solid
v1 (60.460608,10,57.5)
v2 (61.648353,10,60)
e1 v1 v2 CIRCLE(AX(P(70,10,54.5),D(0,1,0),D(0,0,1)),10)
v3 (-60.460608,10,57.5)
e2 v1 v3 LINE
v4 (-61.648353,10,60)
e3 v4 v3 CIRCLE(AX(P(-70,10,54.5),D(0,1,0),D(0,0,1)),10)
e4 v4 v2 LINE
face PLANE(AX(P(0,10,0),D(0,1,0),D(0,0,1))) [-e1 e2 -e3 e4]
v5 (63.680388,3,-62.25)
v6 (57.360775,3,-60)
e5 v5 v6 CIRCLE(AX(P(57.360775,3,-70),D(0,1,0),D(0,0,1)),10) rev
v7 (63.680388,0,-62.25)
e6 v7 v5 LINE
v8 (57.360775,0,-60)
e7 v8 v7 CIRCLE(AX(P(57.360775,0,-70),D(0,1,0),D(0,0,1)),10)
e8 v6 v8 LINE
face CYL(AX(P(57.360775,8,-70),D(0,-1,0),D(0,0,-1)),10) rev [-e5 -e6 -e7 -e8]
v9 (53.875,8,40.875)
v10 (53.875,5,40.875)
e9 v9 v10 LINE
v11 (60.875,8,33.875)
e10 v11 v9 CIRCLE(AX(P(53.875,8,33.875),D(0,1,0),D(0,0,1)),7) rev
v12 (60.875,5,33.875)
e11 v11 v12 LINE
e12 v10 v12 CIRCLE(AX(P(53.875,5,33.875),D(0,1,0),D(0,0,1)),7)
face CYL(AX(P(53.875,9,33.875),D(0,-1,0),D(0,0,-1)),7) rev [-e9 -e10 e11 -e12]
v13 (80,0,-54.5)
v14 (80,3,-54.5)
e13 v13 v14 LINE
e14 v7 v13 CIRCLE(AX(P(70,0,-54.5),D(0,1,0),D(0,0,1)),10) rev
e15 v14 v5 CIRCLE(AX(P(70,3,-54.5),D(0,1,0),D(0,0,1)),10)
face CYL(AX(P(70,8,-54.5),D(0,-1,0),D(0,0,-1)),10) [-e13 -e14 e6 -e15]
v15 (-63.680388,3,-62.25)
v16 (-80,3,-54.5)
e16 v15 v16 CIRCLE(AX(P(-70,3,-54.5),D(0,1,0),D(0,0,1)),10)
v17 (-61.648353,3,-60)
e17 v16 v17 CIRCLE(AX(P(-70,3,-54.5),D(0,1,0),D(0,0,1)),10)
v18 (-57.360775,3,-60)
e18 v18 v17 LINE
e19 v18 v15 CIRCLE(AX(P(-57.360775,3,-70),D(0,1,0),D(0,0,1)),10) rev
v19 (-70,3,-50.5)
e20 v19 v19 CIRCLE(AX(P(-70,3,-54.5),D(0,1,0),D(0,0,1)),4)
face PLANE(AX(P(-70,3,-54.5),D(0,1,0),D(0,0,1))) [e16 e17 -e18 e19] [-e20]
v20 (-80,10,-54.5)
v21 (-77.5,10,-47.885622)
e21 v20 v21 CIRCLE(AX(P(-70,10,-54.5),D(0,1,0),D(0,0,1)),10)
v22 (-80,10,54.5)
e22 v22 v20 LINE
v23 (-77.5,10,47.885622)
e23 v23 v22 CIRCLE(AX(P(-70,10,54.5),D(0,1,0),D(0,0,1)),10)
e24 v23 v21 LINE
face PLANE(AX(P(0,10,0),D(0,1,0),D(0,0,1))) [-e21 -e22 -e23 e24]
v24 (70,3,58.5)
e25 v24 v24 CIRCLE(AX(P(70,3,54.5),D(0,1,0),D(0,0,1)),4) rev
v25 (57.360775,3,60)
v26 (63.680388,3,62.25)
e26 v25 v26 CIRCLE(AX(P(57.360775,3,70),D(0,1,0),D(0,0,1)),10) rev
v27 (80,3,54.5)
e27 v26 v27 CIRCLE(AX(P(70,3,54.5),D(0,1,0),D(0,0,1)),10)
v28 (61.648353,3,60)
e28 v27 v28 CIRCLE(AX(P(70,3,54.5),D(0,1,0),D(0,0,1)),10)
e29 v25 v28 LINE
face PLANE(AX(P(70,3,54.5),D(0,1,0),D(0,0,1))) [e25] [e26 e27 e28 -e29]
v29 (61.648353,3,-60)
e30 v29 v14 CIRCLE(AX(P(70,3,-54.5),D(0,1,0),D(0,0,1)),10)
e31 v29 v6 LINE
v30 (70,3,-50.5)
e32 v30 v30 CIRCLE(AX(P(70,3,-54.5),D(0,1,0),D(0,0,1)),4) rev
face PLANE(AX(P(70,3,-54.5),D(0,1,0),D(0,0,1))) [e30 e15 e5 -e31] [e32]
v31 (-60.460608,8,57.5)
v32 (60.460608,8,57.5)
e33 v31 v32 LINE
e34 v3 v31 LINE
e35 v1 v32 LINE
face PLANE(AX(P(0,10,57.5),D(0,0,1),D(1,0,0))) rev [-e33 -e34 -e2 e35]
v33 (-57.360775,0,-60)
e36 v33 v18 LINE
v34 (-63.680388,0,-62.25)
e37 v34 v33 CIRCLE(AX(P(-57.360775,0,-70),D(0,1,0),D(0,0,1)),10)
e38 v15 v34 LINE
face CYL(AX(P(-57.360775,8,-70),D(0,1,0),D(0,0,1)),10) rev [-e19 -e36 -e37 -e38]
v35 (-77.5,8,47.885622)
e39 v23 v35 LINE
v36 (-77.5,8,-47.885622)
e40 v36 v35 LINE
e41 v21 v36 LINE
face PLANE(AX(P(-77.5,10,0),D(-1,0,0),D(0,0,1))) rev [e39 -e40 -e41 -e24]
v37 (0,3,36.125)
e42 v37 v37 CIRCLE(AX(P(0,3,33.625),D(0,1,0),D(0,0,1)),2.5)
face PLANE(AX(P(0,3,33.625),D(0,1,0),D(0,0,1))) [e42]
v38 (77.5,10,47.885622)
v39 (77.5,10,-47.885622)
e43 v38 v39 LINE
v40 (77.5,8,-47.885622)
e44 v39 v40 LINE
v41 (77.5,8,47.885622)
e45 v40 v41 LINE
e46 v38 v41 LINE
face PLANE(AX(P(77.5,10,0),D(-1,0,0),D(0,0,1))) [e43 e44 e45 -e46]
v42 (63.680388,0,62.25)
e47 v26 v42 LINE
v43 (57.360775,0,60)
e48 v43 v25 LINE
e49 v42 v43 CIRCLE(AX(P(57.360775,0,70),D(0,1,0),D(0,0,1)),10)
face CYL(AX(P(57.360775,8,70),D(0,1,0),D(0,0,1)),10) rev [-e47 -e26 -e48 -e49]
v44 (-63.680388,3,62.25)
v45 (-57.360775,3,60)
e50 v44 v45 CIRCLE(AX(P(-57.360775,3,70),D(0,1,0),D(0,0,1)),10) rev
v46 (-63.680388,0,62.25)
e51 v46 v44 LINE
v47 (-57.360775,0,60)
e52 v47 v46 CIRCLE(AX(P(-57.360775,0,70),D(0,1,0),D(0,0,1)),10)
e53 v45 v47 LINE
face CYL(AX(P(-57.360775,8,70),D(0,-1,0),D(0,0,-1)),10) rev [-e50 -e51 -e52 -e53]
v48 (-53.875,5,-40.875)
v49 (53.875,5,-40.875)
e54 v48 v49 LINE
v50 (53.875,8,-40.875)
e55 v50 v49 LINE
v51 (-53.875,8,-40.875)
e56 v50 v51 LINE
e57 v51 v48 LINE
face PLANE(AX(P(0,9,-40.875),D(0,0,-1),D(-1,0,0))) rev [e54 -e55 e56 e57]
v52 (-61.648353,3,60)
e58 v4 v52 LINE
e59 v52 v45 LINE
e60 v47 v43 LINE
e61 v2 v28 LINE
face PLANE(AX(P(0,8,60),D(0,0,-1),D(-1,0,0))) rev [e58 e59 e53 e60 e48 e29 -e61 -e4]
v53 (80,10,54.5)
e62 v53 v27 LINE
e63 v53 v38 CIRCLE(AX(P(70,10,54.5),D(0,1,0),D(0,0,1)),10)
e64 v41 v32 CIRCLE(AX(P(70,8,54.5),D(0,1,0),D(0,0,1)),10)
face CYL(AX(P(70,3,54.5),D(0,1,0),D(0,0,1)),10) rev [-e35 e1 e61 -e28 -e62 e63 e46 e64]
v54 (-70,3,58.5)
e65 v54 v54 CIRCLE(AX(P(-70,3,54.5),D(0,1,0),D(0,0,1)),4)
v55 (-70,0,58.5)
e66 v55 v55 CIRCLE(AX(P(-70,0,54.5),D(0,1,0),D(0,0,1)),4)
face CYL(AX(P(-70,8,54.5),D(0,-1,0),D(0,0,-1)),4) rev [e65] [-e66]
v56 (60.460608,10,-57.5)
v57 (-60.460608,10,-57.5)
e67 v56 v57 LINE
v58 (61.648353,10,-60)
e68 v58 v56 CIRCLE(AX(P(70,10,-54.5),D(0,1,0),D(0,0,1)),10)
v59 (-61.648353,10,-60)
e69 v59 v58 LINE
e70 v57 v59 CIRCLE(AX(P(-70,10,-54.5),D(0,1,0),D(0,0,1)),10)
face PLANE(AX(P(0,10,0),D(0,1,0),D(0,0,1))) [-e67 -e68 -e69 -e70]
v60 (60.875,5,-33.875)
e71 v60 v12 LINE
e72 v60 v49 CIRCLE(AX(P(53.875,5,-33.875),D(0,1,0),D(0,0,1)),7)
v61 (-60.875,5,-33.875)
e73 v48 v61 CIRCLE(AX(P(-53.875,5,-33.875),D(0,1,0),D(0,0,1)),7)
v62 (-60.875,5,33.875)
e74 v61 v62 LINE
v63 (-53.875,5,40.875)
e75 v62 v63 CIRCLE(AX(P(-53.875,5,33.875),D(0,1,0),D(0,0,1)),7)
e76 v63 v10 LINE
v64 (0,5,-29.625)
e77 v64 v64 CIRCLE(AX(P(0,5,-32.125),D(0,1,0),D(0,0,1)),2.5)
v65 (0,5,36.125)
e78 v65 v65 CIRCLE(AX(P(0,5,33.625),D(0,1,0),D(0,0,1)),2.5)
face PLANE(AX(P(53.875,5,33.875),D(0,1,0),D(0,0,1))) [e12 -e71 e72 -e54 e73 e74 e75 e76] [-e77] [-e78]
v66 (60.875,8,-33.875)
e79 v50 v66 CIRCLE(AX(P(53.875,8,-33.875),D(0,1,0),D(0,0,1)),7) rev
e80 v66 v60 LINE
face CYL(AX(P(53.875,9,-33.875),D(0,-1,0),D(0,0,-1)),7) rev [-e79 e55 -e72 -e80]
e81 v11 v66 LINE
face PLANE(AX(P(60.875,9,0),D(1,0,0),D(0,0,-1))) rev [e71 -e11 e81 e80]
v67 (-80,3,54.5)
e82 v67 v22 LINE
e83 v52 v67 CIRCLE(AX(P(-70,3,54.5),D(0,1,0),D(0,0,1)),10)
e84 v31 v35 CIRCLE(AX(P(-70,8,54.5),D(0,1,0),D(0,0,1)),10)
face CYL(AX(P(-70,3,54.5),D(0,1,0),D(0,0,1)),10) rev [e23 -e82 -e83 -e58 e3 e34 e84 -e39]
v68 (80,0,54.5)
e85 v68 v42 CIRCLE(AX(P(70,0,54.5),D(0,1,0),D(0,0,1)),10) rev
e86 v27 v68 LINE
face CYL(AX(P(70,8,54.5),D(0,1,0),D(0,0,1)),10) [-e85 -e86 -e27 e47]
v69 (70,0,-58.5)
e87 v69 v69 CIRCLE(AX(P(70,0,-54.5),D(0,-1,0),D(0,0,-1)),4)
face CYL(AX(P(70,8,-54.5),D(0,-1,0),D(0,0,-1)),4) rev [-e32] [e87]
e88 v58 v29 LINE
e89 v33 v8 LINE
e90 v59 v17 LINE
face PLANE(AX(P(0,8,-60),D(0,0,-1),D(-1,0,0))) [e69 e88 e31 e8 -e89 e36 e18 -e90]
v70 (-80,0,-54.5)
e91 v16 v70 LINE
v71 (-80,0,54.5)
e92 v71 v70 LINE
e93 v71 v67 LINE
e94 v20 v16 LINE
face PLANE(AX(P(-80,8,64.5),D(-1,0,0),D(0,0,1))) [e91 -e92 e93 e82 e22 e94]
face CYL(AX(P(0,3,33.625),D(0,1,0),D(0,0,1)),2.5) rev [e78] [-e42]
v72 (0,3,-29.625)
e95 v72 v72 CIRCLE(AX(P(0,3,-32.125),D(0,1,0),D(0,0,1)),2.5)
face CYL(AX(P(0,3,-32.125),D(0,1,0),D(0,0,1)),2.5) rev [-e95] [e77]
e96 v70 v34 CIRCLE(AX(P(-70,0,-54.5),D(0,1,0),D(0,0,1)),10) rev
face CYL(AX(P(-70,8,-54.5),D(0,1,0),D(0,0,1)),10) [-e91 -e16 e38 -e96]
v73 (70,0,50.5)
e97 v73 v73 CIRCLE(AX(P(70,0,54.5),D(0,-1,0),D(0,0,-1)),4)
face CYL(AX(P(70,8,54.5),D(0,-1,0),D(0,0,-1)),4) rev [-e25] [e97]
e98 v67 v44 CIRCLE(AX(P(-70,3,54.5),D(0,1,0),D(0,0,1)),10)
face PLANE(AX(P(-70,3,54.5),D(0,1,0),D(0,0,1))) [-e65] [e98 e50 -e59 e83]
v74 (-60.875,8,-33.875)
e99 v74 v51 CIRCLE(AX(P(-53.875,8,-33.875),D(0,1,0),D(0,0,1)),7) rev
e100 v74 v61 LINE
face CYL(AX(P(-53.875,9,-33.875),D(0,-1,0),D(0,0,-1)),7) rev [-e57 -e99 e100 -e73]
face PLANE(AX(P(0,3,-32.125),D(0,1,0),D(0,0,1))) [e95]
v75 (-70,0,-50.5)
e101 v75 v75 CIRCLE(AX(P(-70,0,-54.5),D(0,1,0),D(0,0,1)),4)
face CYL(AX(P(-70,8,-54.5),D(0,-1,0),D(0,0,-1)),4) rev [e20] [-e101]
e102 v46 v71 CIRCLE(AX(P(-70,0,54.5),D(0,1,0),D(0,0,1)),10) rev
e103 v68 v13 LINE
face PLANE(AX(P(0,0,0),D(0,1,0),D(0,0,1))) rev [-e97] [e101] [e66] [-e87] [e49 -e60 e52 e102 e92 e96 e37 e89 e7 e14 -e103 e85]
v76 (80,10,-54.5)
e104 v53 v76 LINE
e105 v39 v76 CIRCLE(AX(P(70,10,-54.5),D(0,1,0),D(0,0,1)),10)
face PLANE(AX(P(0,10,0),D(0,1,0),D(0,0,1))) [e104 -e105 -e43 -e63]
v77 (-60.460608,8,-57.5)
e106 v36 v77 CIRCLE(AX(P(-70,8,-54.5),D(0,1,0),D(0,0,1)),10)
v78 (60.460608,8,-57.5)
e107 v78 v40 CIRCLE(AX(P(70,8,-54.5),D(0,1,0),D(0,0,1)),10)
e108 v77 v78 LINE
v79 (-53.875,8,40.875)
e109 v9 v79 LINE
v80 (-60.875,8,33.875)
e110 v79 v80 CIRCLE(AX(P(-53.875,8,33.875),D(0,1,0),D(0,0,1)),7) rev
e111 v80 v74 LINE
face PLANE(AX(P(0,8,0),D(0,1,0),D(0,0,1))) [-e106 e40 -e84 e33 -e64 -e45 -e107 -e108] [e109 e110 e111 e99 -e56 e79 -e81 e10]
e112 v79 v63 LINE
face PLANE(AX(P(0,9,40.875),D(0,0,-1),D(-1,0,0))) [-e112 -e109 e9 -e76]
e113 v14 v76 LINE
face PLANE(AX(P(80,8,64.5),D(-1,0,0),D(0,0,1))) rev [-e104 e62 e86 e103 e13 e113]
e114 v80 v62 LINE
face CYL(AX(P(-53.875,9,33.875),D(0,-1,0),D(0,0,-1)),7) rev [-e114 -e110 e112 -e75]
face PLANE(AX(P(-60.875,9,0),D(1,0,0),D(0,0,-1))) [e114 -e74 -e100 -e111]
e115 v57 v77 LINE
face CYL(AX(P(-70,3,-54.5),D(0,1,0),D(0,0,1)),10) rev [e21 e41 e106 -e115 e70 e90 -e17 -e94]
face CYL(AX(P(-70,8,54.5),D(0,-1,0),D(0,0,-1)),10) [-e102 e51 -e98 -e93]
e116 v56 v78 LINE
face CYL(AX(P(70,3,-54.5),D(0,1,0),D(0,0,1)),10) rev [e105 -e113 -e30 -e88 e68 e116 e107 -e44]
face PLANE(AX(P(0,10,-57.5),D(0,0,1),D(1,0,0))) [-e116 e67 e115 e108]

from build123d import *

# Parameters (mm, degrees)
SKETCH1_W               = 160
SKETCH1_H               = 129
BOSS_EXTRUDE1_DEPTH     = 8
SKETCH1_3_R             = 4
CUT_EXTRUDE2_DEPTH      = 104.074002542
FILLET1_R               = 10
CUT_EXTRUDE4_DEPTH      = 1
CUT_EXTRUDE4_DEPTH_BACK = 3
CUT_EXTRUDE4_START      = 8
CUT_EXTRUDE9_DEPTH      = 104.074002542
CUT_EXTRUDE10_START     = 8
SKETCH1_17_R            = 2.5
SKETCH1_17_R_2          = 10
CUT_EXTRUDE10_DEPTH     = 5
BOSS_EXTRUDE4_START     = 10
BOSS_EXTRUDE4_DEPTH     = 10
FILLET2_R               = 10


with BuildPart() as part:
    # Sketch1 → Boss-Extrude1 (new body)
    with BuildSketch(Plane(origin=(0, 0, 0), x_dir=(1, 0, 0), z_dir=(0, 1, 0))):
        Rectangle(SKETCH1_W, SKETCH1_H)
    extrude(amount=BOSS_EXTRUDE1_DEPTH)

    # Sketch1<3> → Cut-Extrude2 (cut, through all)
    with BuildSketch(Plane(origin=(0, 0, 0), x_dir=(1, 0, 0), z_dir=(0, 1, 0))):
        with Locations(Location((-70, 54.5, 0), (0, 0, 270))):
            Circle(SKETCH1_3_R)
        with Locations(Location((-70, -54.5, 0), (0, 0, 270))):
            Circle(SKETCH1_3_R)
        with Locations(Location((70, -54.5, 0), (0, 0, 90))):
            Circle(SKETCH1_3_R)
        with Locations(Location((70, 54.5, 0), (0, 0, 90))):
            Circle(SKETCH1_3_R)
    extrude(amount=CUT_EXTRUDE2_DEPTH, mode=Mode.SUBTRACT)

    # Fillet1
    fillet1_edges = [part.edges().sort_by_distance(p)[0] for p in [
        (80, 4, 64.5),
        (-80, 4, 64.5),
        (-80, 4, -64.5),
        (80, 4, -64.5),
    ]]
    fillet(fillet1_edges, radius=FILLET1_R)

    # Sketch1<11> → Cut-Extrude4 (cut, two sides: drawn at the far end of the back side and taken through both)
    with BuildSketch(Plane(origin=(0, 0, 0), x_dir=(1, 0, 0), z_dir=(0, 1, 0)).offset(CUT_EXTRUDE4_START - CUT_EXTRUDE4_DEPTH_BACK)):
        with BuildLine():
            Line((53.875, -40.875), (-53.875, -40.875))
            ThreePointArc((-53.875, -40.875), (-58.824747468, -38.824747468), (-60.875, -33.875))
            Line((-60.875, -33.875), (-60.875, 33.875))
            ThreePointArc((-60.875, 33.875), (-58.824747468, 38.824747468), (-53.875, 40.875))
            Line((-53.875, 40.875), (53.875, 40.875))
            ThreePointArc((53.875, 40.875), (58.824747468, 38.824747468), (60.875, 33.875))
            Line((60.875, 33.875), (60.875, -33.875))
            ThreePointArc((60.875, -33.875), (58.824747468, -38.824747468), (53.875, -40.875))
        make_face()
    extrude(amount=CUT_EXTRUDE4_DEPTH + CUT_EXTRUDE4_DEPTH_BACK, mode=Mode.SUBTRACT)

    # Sketch1<13> → Cut-Extrude9 (cut, through all)
    with BuildSketch(Plane(origin=(0, 0, 0), x_dir=(1, 0, 0), z_dir=(0, 1, 0))):
        with BuildLine():
            Line((-70, -64.5), (70, -64.5))
            ThreePointArc((70, -64.5), (65.25658351, -63.303408431), (61.648353456, -60))
            Line((61.648353456, -60), (-61.648353456, -60))
            ThreePointArc((-61.648353456, -60), (-65.25658351, -63.303408431), (-70, -64.5))
        make_face()
        with BuildLine():
            ThreePointArc((61.648353456, 60), (65.25658351, 63.303408431), (70, 64.5))
            Line((70, 64.5), (-69.999999984, 64.5))
            ThreePointArc((-69.999999984, 64.5), (-65.256583502, 63.303408427), (-61.648353456, 60))
            Line((-61.648353456, 60), (61.648353456, 60))
        make_face()
    extrude(amount=CUT_EXTRUDE9_DEPTH, mode=Mode.SUBTRACT)

    # Sketch1<17> → Cut-Extrude10 (cut)
    with BuildSketch(Plane(origin=(0, 0, 0), x_dir=(1, 0, 0), z_dir=(0, 1, 0)).offset(CUT_EXTRUDE10_START)):
        with Locations(Location((0, 32.125, 0), (0, 0, 270))):
            Circle(SKETCH1_17_R)
        with Locations((-70, 54.5)):
            Circle(SKETCH1_17_R_2)
        with Locations((70, 54.5)):
            Circle(SKETCH1_17_R_2)
        with Locations((-70, -54.5)):
            Circle(SKETCH1_17_R_2)
        with Locations((70, -54.5)):
            Circle(SKETCH1_17_R_2)
        with Locations(Location((0, -33.625, 0), (0, 0, 270))):
            Circle(SKETCH1_17_R)
    extrude(amount=-CUT_EXTRUDE10_DEPTH, mode=Mode.SUBTRACT)

    # Sketch1<18> → Boss-Extrude4 (add)
    with BuildSketch(Plane(origin=(0, 0, 0), x_dir=(1, 0, 0), z_dir=(0, 1, 0)).offset(BOSS_EXTRUDE4_START)):
        with BuildLine():
            ThreePointArc((60.460607986, 57.5), (60.967568701, 58.791291743), (61.648353456, 60))
            Line((61.648353456, 60), (-61.648353456, 60))
            ThreePointArc((-61.648353456, 60), (-60.967568701, 58.791291743), (-60.460607986, 57.5))
            Line((-60.460607986, 57.5), (60.460607986, 57.5))
        make_face()
        with BuildLine():
            Line((-80, 54.500000177), (-80, -54.5))
            ThreePointArc((-80, -54.5), (-79.354143467, -50.964466094), (-77.5, -47.885621722))
            Line((-77.5, -47.885621722), (-77.5, 47.885621722))
            ThreePointArc((-77.5, 47.885621722), (-79.354143498, 50.964466177), (-80, 54.500000177))
        make_face()
        with BuildLine():
            ThreePointArc((77.5, -47.885621722), (79.354143467, -50.964466094), (80, -54.5))
            Line((80, -54.5), (80, 54.5))
            ThreePointArc((80, 54.5), (79.354143467, 50.964466094), (77.5, 47.885621722))
            Line((77.5, 47.885621722), (77.5, -47.885621722))
        make_face()
        with BuildLine():
            Line((-61.648353456, -60), (61.648353456, -60))
            ThreePointArc((61.648353456, -60), (60.967568701, -58.791291743), (60.460607986, -57.5))
            Line((60.460607986, -57.5), (-60.460607986, -57.5))
            ThreePointArc((-60.460607986, -57.5), (-60.967568701, -58.791291743), (-61.648353456, -60))
        make_face()
    extrude(amount=-BOSS_EXTRUDE4_DEPTH)

    # Fillet2
    # the kernel refuses this fillet: 10 mm, written as the material it adds along each edge
    with BuildSketch(Plane(origin=(61.648353456, 0, 60), x_dir=(0.6702455950029323, 0, 0.7421393685684416), z_dir=(0, 1, 0)), Plane(origin=(-61.648353456, 0, -60), x_dir=(-0.6702455950029282, 0, -0.7421393685684453), z_dir=(0, 1, 0))) as fillet2_piece_1:
        with BuildLine():
            CenterArc((4.547663341, -9.884436465), FILLET2_R, 98.719009802, 39.194967426)
            Line((-2.873730345, -3.181980515), (0, 0))
            ThreePointArc((0, 0), (1.51588778, -0.115563535), (3.03177556, 0))
        make_face()
    extrude(amount=3)
    with BuildSketch(Plane(origin=(-61.648353456, 0, 60), x_dir=(1, 0, 0), z_dir=(0, 1, 0))) as fillet2_piece_2:
        with BuildLine():
            CenterArc((4.287578116, -10), FILLET2_R, 90, 39.194967426)
            ThreePointArc((-2.032034214, -2.25), (-0.930252859, -1.20245595), (0, 0))
            Line((0, 0), (4.287578116, 0))
        make_face()
    extrude(amount=3)
    with BuildSketch(Plane(origin=(61.648353456, 0, -60), x_dir=(0.6702455950029361, 0, -0.7421393685684381), z_dir=(0, 1, 0))) as fillet2_piece_3:
        with BuildLine():
            CenterArc((4.547663341, 9.884436465), FILLET2_R, 222.086022772, 39.194967426)
            Line((-2.873730345, 3.181980515), (0, 0))
            ThreePointArc((0, 0), (1.51588778, 0.115563535), (3.03177556, 0))
        make_face()
    extrude(amount=3)


solid = part.part
